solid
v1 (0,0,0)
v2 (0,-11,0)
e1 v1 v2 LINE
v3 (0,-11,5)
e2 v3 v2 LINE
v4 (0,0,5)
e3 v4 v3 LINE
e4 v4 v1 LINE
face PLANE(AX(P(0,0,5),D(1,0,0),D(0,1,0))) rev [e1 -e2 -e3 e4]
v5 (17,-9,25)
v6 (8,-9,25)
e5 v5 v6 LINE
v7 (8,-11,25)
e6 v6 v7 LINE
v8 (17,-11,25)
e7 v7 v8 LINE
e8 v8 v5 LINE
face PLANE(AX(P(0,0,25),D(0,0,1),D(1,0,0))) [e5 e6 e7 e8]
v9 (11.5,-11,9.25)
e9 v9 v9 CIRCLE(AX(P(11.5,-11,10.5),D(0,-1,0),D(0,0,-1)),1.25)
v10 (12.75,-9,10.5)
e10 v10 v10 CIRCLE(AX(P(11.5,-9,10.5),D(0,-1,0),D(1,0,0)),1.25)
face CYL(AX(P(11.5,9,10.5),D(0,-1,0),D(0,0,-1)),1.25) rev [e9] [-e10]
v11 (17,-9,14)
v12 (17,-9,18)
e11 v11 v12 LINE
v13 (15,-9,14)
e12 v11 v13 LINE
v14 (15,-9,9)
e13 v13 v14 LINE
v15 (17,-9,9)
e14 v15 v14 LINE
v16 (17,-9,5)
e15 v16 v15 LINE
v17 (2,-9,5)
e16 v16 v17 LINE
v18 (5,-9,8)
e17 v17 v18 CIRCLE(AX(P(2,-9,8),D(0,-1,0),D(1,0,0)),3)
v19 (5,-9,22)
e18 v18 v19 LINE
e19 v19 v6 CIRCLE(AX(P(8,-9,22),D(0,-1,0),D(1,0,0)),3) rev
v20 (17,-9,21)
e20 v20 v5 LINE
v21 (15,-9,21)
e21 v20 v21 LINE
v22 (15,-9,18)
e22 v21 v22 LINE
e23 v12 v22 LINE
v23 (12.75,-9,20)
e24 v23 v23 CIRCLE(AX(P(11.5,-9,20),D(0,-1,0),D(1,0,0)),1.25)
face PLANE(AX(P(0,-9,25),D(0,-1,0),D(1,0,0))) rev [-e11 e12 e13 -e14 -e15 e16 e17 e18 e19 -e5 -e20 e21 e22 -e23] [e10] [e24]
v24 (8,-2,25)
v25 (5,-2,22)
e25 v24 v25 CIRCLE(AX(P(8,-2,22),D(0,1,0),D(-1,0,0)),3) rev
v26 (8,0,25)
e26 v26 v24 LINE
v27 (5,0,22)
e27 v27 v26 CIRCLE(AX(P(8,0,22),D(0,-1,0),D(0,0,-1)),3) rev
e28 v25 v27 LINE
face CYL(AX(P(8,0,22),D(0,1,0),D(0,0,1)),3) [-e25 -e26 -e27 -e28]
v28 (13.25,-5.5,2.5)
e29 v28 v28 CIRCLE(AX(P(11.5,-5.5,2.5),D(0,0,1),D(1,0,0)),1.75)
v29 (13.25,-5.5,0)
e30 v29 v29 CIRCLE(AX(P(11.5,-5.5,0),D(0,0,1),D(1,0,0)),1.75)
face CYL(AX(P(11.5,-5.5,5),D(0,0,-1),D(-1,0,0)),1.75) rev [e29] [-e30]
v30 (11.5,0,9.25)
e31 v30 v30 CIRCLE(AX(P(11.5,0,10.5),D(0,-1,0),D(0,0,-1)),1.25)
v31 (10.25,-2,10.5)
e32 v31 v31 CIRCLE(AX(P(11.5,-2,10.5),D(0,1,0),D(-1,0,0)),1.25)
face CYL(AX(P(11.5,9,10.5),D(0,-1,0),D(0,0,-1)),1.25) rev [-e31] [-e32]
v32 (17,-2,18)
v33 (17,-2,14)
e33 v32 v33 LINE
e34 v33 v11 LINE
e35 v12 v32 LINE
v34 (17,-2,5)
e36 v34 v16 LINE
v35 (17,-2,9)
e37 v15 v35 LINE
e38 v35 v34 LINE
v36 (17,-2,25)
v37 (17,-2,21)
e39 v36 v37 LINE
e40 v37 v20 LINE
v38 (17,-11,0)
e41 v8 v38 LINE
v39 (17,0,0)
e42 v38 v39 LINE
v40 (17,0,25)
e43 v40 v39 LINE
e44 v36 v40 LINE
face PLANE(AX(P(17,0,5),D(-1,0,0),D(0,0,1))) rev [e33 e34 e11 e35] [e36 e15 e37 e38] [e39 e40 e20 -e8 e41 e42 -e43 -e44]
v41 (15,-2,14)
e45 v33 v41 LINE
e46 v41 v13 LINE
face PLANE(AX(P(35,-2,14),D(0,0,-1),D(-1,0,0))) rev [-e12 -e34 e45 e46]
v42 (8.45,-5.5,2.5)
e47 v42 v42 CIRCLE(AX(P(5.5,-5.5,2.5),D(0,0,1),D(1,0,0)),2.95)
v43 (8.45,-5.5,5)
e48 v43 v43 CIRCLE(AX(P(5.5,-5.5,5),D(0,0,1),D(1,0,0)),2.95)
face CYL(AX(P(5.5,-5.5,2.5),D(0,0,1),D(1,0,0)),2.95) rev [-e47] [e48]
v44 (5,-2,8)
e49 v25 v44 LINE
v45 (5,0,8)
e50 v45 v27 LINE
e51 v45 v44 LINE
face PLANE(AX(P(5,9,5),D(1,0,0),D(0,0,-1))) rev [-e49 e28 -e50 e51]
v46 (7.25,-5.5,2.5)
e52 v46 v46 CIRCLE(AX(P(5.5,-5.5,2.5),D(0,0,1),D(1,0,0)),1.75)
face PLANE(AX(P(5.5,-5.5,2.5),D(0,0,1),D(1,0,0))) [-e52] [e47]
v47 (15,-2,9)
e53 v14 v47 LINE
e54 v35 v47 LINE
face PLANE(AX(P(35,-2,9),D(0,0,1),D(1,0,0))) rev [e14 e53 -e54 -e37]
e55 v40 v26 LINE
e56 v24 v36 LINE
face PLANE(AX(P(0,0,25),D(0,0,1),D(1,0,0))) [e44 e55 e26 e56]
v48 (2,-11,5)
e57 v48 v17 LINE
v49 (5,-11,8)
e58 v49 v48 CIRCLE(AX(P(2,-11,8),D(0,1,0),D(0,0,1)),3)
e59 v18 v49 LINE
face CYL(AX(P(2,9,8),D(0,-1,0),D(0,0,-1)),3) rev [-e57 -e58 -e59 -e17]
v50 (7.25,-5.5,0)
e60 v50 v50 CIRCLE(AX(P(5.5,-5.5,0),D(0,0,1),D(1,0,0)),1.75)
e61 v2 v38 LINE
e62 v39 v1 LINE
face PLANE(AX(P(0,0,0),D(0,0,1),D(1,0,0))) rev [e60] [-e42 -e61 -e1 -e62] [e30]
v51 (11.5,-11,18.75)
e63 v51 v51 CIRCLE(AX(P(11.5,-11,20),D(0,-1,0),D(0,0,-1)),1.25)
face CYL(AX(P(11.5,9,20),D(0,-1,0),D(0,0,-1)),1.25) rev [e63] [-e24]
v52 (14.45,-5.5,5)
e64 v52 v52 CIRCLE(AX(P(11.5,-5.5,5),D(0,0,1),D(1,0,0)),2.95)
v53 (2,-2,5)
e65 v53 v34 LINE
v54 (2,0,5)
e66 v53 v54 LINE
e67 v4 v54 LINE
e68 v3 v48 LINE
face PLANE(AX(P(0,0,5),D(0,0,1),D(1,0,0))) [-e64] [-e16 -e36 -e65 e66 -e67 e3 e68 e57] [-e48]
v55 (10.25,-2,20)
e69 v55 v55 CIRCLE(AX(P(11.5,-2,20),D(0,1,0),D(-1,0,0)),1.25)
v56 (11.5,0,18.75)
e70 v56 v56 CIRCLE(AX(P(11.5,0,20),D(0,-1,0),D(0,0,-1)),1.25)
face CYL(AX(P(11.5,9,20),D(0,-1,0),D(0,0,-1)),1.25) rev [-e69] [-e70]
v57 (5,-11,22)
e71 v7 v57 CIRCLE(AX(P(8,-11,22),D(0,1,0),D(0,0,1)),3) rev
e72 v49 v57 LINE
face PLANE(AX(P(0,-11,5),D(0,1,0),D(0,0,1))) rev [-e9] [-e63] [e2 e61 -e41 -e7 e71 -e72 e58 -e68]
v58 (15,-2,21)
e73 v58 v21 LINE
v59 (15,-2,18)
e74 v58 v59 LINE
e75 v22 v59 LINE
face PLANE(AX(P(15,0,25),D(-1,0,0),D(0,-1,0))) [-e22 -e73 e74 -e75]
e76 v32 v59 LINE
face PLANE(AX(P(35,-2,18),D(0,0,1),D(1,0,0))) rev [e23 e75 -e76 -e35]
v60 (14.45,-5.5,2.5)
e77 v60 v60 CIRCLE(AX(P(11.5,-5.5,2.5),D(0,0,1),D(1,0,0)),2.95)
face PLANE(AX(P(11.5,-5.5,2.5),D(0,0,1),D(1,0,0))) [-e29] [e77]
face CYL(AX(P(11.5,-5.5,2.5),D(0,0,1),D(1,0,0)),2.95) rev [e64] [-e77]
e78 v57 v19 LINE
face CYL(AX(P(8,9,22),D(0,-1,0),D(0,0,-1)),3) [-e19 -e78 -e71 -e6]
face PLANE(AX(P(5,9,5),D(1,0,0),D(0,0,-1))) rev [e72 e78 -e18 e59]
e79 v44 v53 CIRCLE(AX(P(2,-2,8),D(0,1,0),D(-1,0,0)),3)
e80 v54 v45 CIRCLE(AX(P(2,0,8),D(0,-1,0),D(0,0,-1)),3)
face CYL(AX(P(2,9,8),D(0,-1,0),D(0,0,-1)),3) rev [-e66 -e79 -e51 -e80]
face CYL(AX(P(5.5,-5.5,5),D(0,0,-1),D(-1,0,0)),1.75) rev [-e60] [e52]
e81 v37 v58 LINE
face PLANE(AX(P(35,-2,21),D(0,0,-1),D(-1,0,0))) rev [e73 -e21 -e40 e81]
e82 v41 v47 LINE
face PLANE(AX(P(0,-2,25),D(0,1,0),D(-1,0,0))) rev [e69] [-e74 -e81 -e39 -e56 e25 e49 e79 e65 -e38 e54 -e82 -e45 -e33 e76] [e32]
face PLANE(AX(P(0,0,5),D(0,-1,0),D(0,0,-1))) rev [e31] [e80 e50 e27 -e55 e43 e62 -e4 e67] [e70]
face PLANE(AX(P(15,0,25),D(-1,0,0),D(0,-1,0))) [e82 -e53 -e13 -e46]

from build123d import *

# Parameters (mm, degrees)
ESQUISSE1_W             = 17
ESQUISSE1_H             = 11
ESQUISSE1_R             = 1.75
BOSS_EXTRU_1_DEPTH      = 5
ESQUISSE2_W             = 2
ESQUISSE2_H             = 7
BOSS_EXTRU_2_DEPTH      = 20
ESQUISSE3_W             = 4
ESQUISSE3_H             = 7
ENL_V_MAT_EXTRU_1_DEPTH = 20
ESQUISSE4_R             = 1.25
ESQUISSE4_W             = 5
ESQUISSE4_H             = 20
ENL_V_MAT_EXTRU_2_DEPTH = 20
ESQUISSE5_R             = 2.95
ENL_V_MAT_EXTRU_3_DEPTH = 2.5
CONG_1_START            = -11
CONG_1_DEPTH            = 11
CONG_1_2_DEPTH          = 2
CONG_1_START_2          = -2
CONG_1_3_DEPTH          = 2


with BuildPart() as part:
    # Esquisse1 → Boss.-Extru.1 (new body)
    with BuildSketch(Plane.XY):
        with Locations((8.5, -5.5)):
            Rectangle(ESQUISSE1_W, ESQUISSE1_H)
        with Locations((5.5, -5.5)):
            Circle(ESQUISSE1_R, mode=Mode.SUBTRACT)
        with Locations((11.5, -5.5)):
            Circle(ESQUISSE1_R, mode=Mode.SUBTRACT)
    extrude(amount=BOSS_EXTRU_1_DEPTH)

    # Esquisse2 → Boss.-Extru.2 (add)
    with BuildSketch(Plane.XY.offset(5)):
        Polygon((15, -9), (0, -9), (0, -11), (17, -11), (17, -9), align=None)
        with Locations((16, -5.5)):
            Rectangle(ESQUISSE2_W, ESQUISSE2_H)
        Polygon((17, 0), (0, 0), (0, -2), (15, -2), (17, -2), align=None)
    extrude(amount=BOSS_EXTRU_2_DEPTH)

    # Esquisse3 → Enlèv. mat.-Extru.1 (cut)
    with BuildSketch(Plane.ZY.offset(-15)):
        with Locations((7, -5.5)):
            Rectangle(ESQUISSE3_W, ESQUISSE3_H)
        with Locations((23, -5.5)):
            Rectangle(ESQUISSE3_W, ESQUISSE3_H)
        with Locations((16, -5.5)):
            Rectangle(ESQUISSE3_W, ESQUISSE3_H)
    extrude(amount=-ENL_V_MAT_EXTRU_1_DEPTH, mode=Mode.SUBTRACT)

    # Esquisse4 → Enlèv. mat.-Extru.2 (cut)
    with BuildSketch(Plane(origin=(0, -11, 0), x_dir=(-1, 0, 0), z_dir=(0, -1, 0))):
        with Locations(Location((-11.5, -20, 0), (0, 0, 90))):
            Circle(ESQUISSE4_R)
        with Locations(Location((-11.5, -10.5, 0), (0, 0, 90))):
            Circle(ESQUISSE4_R)
        with Locations((-2.5, -15)):
            Rectangle(ESQUISSE4_W, ESQUISSE4_H)
    extrude(amount=-ENL_V_MAT_EXTRU_2_DEPTH, mode=Mode.SUBTRACT)

    # Esquisse5 → Enlèv. mat.-Extru.3 (cut)
    with BuildSketch(Plane.XY.offset(5)):
        with Locations((5.5, -5.5)):
            Circle(ESQUISSE5_R)
        with Locations((11.5, -5.5)):
            Circle(ESQUISSE5_R)
    extrude(amount=-ENL_V_MAT_EXTRU_3_DEPTH, mode=Mode.SUBTRACT)

    # Congé1: read off the stored shape, not the designer's step
    # Congé1 outline → Congé1 (cut)
    with BuildSketch(Plane(origin=(0, 0, 0), x_dir=(1, 0, 0), z_dir=(0, 1, 0)).offset(CONG_1_START)):
        with BuildLine():
            ThreePointArc((8, -25), (5.878679656, -24.121320344), (5, -22))
            Line((5, -22), (5, -25))
            Line((5, -25), (8, -25))
        make_face()
    extrude(amount=CONG_1_DEPTH, mode=Mode.SUBTRACT)

    # Cong_1 2 outline → Cong_1 2 (add)
    with BuildSketch(Plane(origin=(0, 0, 0), x_dir=(1, 0, 0), z_dir=(0, 1, 0)).offset(CONG_1_START)):
        with BuildLine():
            ThreePointArc((2, -5), (4.121320344, -5.878679656), (5, -8))
            Line((5, -8), (5, -5))
            Line((5, -5), (2, -5))
        make_face()
    extrude(amount=CONG_1_2_DEPTH)

    # Cong_1 3 outline → Cong_1 3 (add)
    with BuildSketch(Plane(origin=(0, 0, 0), x_dir=(1, 0, 0), z_dir=(0, 1, 0)).offset(CONG_1_START_2)):
        with BuildLine():
            ThreePointArc((2, -5), (4.121320344, -5.878679656), (5, -8))
            Line((5, -8), (5, -5))
            Line((5, -5), (2, -5))
        make_face()
    extrude(amount=CONG_1_3_DEPTH)


solid = part.part
